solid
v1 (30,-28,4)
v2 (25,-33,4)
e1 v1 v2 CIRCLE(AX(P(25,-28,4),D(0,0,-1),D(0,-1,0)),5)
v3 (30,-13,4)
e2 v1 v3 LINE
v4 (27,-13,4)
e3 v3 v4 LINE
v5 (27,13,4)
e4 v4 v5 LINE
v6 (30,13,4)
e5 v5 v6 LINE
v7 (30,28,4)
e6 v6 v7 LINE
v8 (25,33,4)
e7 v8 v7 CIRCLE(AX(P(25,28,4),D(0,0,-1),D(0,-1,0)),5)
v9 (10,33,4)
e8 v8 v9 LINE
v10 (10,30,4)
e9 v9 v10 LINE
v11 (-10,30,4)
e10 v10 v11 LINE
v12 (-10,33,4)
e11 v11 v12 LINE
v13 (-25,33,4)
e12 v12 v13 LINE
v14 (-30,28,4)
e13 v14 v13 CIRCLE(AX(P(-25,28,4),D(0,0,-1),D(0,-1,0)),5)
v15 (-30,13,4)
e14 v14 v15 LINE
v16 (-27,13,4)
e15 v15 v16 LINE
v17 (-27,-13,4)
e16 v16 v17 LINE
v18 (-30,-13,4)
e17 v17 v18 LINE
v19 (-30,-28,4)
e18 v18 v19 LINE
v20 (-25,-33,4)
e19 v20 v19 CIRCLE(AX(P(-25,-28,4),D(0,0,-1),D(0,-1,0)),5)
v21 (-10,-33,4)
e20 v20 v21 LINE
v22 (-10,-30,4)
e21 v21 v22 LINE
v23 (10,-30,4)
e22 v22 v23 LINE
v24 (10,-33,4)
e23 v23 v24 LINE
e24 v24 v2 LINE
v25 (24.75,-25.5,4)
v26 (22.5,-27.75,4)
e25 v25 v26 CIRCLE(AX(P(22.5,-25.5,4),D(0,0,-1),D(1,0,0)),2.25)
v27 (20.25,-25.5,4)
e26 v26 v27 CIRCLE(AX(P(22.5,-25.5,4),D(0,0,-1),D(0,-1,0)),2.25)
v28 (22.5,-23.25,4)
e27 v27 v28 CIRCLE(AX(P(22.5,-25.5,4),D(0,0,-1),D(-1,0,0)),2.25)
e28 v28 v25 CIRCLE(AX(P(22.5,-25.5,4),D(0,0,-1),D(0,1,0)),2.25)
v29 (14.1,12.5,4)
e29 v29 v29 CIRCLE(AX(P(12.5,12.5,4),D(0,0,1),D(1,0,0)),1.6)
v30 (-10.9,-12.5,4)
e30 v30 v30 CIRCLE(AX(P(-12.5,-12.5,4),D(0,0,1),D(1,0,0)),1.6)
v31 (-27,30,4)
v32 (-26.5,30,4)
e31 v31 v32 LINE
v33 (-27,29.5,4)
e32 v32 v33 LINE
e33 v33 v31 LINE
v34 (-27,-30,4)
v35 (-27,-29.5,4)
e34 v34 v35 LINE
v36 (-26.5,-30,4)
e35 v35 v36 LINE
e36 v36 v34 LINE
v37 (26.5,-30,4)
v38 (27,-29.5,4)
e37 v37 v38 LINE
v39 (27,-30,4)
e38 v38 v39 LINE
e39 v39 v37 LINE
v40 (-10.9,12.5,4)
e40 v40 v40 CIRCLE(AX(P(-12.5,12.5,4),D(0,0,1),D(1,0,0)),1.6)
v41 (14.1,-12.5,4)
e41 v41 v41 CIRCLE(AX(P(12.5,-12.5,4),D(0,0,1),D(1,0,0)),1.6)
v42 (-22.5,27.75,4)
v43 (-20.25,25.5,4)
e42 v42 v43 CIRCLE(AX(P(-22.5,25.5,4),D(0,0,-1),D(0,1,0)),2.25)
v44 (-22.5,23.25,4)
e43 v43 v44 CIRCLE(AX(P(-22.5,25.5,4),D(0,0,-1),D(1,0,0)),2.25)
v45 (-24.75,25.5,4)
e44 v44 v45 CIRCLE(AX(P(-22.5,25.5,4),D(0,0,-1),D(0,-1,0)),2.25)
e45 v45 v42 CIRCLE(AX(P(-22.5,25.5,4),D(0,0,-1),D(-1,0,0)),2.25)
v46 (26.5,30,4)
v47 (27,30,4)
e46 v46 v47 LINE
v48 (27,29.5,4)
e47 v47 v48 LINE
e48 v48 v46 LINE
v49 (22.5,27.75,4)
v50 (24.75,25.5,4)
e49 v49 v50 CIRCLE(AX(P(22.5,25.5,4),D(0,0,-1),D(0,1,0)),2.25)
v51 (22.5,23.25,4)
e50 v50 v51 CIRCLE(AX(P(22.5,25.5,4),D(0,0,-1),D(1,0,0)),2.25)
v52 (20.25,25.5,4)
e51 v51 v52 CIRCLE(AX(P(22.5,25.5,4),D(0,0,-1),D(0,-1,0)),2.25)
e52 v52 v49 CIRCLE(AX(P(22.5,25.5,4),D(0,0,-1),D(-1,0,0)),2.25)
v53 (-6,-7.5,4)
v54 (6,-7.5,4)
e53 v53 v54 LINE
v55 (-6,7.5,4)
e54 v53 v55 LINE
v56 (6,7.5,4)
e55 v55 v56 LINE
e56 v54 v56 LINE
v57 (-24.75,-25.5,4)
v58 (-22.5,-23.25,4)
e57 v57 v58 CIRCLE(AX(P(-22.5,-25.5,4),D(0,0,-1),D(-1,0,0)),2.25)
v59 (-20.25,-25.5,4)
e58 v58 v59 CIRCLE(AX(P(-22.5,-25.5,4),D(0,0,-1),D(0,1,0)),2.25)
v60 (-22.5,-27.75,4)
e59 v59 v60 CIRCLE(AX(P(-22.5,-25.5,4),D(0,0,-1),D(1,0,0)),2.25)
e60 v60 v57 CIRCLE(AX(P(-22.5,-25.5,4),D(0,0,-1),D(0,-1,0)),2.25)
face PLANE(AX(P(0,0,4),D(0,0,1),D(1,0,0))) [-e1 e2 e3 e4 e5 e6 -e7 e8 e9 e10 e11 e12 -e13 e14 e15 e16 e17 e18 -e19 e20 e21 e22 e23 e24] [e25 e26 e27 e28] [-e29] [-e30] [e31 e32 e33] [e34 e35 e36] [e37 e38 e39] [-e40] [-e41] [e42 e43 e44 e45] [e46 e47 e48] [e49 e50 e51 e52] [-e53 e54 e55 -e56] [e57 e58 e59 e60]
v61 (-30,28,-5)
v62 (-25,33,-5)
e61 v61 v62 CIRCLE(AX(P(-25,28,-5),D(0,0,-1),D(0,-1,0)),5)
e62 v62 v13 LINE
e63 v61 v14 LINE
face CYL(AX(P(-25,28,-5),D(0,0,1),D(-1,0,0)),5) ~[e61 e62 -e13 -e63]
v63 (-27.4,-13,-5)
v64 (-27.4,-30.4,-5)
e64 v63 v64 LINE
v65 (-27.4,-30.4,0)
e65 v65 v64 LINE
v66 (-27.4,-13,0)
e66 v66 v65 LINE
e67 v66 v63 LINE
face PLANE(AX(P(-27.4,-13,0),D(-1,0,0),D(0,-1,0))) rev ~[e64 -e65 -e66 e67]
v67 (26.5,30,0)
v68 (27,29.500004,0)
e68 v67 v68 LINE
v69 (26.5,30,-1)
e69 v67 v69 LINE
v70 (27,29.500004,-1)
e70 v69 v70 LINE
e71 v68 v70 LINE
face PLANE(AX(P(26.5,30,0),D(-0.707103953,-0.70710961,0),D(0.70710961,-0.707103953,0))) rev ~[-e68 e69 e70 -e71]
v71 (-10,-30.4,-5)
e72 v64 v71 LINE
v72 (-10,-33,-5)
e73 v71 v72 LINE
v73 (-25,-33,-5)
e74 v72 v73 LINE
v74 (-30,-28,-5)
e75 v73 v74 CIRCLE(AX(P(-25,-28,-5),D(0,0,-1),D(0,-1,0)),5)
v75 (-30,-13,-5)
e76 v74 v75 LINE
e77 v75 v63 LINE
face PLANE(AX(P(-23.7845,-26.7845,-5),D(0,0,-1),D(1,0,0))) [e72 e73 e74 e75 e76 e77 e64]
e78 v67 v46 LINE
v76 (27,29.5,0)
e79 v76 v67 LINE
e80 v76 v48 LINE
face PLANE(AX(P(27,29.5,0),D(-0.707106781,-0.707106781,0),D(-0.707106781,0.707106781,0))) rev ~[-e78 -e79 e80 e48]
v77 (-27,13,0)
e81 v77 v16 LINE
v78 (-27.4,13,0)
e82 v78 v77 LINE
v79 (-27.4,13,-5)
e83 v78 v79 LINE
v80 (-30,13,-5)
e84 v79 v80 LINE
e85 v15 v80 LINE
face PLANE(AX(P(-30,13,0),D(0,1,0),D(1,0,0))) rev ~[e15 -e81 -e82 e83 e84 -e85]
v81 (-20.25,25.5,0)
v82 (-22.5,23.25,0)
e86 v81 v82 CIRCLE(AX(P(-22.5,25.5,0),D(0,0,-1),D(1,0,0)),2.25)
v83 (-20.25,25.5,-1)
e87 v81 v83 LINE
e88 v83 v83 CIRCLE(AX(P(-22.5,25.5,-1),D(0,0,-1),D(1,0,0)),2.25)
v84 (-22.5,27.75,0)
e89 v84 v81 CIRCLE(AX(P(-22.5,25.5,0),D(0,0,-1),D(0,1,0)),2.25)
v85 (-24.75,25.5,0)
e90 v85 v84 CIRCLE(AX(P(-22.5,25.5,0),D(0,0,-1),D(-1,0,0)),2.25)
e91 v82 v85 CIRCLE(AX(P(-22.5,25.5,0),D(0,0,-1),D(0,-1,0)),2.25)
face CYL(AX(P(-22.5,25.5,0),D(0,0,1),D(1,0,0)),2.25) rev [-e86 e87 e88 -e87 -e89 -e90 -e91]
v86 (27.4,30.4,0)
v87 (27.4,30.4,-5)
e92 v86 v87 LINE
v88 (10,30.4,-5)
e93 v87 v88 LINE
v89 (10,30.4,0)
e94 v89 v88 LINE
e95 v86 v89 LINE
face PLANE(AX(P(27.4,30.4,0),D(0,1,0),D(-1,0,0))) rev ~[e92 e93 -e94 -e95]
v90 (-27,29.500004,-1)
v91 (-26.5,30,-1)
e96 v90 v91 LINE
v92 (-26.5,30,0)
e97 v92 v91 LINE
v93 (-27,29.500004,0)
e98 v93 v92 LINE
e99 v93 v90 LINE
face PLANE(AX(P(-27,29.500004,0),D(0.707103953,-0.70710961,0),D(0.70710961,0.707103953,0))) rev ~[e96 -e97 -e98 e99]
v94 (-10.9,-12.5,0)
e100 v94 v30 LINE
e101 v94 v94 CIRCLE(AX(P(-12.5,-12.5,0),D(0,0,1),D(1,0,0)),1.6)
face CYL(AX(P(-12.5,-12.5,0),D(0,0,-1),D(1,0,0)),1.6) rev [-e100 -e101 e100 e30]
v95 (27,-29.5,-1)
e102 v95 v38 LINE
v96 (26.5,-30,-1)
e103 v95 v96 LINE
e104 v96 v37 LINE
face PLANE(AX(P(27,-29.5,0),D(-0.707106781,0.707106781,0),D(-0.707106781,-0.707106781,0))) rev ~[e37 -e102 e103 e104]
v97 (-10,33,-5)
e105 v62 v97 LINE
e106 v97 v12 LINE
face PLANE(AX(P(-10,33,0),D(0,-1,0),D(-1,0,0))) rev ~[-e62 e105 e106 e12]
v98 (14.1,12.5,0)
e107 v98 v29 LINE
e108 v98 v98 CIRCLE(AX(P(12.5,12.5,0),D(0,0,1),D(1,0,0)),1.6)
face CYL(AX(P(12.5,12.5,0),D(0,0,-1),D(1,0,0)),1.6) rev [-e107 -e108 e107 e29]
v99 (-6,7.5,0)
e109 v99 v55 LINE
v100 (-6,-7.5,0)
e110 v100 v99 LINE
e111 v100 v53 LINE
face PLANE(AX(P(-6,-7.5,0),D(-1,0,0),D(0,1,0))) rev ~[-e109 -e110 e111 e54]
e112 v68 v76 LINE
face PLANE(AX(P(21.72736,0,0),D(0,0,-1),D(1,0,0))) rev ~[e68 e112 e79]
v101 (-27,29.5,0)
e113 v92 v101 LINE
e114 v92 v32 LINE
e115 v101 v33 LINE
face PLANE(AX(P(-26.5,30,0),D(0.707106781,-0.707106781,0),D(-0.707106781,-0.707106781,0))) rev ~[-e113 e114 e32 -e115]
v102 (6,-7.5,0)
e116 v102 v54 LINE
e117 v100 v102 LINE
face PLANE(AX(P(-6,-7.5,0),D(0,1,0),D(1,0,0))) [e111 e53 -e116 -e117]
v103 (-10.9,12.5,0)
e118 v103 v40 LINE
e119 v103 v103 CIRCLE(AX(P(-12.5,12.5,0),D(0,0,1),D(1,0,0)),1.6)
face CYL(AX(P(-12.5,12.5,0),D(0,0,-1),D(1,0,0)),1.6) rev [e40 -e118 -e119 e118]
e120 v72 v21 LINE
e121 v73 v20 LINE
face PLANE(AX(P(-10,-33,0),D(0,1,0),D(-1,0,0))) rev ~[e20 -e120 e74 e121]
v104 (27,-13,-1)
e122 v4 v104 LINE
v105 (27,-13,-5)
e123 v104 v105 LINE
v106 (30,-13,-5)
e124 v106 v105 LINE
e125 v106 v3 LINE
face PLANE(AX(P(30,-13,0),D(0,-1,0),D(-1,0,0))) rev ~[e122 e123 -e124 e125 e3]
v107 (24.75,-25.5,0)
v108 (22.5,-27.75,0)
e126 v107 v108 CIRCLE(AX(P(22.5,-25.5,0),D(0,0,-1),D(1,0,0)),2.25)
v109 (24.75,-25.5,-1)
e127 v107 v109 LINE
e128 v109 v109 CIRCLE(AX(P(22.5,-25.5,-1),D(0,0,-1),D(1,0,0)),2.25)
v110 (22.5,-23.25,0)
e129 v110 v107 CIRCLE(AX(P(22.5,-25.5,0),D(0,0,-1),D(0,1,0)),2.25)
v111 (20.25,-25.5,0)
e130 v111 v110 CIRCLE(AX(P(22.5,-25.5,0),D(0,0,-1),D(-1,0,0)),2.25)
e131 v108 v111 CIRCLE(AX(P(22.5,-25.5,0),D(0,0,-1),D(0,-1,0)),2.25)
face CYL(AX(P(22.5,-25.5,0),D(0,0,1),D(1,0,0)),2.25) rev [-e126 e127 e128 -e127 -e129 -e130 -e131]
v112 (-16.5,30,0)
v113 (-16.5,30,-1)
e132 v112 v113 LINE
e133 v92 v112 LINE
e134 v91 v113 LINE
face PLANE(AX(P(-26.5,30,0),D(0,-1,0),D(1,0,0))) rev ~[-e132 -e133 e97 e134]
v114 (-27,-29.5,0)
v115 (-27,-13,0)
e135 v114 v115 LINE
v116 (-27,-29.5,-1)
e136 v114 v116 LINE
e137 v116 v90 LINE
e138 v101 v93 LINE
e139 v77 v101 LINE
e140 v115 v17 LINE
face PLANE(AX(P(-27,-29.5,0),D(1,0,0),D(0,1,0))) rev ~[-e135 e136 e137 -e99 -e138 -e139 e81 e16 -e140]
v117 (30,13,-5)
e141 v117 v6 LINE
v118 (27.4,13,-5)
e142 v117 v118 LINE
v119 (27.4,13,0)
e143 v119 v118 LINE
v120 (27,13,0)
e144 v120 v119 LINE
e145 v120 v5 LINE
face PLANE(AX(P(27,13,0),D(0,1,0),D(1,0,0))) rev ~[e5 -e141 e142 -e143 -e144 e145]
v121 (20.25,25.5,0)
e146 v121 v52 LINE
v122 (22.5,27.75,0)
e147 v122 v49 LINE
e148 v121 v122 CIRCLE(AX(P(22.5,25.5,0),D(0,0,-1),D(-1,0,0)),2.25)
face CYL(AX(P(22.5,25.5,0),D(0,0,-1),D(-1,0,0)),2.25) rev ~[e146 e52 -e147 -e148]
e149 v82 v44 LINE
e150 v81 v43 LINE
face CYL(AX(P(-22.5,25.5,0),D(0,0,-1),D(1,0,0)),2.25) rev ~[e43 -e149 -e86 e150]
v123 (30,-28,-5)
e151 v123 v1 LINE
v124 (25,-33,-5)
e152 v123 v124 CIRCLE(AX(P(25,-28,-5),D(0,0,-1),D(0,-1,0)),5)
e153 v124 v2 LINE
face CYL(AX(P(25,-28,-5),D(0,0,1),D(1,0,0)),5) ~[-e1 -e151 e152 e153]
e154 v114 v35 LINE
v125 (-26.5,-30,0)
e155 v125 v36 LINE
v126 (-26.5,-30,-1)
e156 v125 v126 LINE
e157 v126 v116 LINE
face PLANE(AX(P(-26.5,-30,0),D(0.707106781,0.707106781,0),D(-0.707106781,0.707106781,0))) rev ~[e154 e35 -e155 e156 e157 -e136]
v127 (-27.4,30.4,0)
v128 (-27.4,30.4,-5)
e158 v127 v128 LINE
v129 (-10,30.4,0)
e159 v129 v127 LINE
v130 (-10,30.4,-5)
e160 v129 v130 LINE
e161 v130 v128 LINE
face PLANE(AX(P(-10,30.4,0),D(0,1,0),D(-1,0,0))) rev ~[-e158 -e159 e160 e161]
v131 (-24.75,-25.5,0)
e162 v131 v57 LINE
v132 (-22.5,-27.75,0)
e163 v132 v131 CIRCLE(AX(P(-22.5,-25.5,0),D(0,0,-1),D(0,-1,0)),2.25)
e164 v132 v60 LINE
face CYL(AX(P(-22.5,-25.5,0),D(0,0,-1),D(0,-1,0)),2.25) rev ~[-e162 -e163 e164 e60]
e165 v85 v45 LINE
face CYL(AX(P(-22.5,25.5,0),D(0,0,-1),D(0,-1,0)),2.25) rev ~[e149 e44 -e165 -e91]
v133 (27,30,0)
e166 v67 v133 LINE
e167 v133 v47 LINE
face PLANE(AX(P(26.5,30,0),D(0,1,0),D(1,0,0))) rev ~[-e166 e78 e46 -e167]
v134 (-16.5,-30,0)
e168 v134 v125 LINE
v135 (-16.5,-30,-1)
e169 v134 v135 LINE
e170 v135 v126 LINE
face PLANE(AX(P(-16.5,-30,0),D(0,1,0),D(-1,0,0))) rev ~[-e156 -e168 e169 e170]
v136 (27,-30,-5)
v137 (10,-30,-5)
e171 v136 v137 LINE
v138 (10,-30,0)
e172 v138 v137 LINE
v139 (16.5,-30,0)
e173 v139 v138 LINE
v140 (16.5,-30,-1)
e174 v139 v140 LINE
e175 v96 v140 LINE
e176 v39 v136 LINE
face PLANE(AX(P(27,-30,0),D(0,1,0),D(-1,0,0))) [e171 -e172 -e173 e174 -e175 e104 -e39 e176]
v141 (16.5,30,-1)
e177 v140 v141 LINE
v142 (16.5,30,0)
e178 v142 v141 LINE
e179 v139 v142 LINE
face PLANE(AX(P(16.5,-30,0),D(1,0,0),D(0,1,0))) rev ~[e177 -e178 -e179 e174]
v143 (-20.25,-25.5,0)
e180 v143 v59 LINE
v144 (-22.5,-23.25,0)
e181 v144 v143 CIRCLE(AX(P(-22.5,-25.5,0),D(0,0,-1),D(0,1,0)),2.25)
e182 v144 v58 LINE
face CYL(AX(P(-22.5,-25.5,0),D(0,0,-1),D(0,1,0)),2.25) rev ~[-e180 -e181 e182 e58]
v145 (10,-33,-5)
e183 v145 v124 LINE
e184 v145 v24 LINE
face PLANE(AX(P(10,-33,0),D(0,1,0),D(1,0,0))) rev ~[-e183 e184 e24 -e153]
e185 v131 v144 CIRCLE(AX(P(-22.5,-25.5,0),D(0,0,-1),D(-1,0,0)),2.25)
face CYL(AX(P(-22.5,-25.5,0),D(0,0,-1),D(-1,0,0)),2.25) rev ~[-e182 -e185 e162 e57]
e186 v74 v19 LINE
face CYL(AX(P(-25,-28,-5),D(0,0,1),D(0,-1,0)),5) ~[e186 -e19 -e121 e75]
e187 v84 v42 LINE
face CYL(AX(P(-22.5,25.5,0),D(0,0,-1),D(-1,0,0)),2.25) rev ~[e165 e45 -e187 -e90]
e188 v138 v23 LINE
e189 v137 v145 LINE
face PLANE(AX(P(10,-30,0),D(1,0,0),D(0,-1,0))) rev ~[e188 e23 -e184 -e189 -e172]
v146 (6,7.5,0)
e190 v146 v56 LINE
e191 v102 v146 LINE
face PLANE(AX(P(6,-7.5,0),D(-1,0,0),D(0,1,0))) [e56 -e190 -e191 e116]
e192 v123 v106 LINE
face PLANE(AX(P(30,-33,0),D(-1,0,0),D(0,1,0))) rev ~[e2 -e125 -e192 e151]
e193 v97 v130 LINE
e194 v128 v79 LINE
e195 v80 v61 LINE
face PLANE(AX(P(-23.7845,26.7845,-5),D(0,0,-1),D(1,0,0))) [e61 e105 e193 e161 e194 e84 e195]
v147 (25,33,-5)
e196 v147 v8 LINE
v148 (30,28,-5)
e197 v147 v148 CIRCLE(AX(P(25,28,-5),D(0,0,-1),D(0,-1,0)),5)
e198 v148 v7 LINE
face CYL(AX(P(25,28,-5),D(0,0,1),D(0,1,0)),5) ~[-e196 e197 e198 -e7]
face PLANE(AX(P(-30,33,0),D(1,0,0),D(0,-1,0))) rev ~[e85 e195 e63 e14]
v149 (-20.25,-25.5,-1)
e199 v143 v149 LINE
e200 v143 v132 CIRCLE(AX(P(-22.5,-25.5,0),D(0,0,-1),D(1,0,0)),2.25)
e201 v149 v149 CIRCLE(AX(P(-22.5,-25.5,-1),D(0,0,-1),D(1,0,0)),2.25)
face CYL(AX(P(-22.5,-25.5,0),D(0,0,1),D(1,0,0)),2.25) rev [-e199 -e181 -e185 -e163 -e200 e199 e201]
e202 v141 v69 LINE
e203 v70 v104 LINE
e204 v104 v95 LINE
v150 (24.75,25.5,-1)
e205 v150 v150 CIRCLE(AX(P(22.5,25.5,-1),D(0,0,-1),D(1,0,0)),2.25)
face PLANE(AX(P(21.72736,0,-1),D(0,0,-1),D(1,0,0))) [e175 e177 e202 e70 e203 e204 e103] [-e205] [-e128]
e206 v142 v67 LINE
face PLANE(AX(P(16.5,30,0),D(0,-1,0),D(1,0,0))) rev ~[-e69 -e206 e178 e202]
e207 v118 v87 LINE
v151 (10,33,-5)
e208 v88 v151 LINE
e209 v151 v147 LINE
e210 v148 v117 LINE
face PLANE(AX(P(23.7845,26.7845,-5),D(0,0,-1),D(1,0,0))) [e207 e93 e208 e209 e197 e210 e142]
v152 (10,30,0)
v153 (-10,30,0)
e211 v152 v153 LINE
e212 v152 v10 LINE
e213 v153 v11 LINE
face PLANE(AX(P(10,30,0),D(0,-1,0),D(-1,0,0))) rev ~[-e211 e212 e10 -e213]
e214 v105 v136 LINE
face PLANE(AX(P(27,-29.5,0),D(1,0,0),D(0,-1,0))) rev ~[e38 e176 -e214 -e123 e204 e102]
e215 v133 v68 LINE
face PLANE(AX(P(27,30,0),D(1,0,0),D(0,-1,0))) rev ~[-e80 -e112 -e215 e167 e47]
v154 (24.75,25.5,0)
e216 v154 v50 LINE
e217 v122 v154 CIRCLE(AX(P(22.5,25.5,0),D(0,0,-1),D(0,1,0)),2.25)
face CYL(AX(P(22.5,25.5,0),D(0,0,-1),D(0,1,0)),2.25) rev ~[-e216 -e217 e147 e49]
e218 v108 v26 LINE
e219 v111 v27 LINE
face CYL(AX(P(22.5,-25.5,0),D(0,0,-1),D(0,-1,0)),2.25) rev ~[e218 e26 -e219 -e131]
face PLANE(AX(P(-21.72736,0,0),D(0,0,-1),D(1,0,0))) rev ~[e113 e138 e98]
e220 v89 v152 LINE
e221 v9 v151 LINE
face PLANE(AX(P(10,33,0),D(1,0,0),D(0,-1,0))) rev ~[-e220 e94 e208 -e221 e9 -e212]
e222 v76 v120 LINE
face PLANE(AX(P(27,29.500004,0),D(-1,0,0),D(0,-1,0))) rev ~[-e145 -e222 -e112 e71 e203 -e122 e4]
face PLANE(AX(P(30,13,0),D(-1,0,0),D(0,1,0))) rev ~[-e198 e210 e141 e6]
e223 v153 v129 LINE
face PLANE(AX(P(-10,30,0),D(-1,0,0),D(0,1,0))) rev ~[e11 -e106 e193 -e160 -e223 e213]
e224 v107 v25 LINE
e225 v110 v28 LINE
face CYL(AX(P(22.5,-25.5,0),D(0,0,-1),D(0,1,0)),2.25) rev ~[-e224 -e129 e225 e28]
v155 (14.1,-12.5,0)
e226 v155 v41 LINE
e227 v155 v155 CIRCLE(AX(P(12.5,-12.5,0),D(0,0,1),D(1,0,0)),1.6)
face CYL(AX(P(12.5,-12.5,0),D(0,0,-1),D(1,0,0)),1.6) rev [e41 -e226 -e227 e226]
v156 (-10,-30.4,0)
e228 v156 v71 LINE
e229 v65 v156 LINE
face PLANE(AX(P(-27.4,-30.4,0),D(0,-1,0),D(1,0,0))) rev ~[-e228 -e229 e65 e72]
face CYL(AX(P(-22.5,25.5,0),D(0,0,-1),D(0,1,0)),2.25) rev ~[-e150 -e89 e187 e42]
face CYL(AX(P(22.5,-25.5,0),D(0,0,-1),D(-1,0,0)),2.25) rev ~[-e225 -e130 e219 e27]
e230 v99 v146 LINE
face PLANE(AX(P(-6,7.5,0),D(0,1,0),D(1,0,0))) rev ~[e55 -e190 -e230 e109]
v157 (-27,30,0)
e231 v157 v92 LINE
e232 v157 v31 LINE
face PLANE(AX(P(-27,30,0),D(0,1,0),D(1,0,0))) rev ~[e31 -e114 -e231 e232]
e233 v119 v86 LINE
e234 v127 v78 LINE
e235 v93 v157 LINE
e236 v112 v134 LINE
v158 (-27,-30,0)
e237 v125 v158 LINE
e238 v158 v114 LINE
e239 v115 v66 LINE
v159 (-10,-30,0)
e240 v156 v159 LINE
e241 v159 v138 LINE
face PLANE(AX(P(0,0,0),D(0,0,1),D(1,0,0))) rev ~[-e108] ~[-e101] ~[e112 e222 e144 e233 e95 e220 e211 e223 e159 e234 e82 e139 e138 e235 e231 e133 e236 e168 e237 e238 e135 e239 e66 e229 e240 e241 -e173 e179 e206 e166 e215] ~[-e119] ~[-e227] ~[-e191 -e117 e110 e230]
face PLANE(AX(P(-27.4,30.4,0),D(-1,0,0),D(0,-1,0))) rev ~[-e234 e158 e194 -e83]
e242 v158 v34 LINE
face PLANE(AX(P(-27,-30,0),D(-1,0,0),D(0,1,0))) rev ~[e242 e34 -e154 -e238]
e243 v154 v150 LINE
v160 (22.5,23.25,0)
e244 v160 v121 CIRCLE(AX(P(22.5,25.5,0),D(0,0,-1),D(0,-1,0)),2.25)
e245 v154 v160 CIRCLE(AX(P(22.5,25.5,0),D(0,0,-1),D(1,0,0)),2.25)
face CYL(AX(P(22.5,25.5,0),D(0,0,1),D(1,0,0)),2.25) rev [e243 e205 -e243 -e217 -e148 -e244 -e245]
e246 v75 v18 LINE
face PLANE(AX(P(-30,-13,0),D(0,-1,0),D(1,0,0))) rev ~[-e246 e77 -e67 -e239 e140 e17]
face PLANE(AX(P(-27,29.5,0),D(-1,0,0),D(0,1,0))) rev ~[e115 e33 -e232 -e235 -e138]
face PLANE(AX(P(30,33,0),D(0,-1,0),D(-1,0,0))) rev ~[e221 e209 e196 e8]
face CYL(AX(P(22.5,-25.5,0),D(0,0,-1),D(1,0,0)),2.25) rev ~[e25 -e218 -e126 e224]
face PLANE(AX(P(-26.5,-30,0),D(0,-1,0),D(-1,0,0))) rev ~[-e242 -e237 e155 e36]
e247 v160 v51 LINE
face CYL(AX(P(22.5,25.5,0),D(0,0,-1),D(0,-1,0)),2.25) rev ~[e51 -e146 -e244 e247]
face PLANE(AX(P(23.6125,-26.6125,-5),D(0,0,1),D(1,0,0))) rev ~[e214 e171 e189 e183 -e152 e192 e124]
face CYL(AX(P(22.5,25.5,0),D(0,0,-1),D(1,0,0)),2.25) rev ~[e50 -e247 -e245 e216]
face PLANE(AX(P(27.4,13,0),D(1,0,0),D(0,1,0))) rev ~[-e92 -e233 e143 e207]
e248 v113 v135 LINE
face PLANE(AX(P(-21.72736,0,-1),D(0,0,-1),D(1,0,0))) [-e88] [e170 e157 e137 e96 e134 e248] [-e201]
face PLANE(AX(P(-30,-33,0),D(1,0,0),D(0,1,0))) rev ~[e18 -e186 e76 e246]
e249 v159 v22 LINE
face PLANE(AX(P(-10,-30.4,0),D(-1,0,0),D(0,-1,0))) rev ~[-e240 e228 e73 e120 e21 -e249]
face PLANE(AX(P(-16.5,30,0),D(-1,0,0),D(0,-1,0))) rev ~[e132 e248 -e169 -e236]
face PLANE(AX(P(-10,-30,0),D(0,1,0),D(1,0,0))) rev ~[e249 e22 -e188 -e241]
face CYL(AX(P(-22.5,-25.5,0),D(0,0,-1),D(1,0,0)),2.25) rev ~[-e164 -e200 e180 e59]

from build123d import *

# Parameters (mm, degrees)
F0_R     = 1.6
F0_W     = 12
F0_H     = 15
F1_DEPTH = 4
F2_R     = 2.25
F3_DEPTH = 1
F4_DEPTH = 5
F5_R     = 5


# Not quite as in the source:
# - ends of sketch curves that miss each other by under 0.0002 mm in the source are joined


with BuildPart() as f1:
    # F0 (on Top) → F1 (new body)
    with BuildSketch(Plane.XY):
        Polygon((-26.600003, -29.899997), (-26.5, -30), (-10, -30), (10, -30), (26.5, -30), (26.6, -29.9), (27, -29.5), (27, -13), (27, 13), (27, 29.5), (26.5999975, 29.9000025), (26.5, 30), (10, 30), (-10, 30), (-26.5, 30), (-26.599999, 29.900001), (-27, 29.5), (-27, 13), (-27, -13), (-27, -29.5), align=None)
        with BuildLine():
            ThreePointArc((-22.5, -23.25), (-20.9090097423, -23.9090097423), (-20.25, -25.5))
            ThreePointArc((-20.25, -25.5), (-20.9090097423, -27.0909902577), (-22.5, -27.75))
            ThreePointArc((-22.5, -27.75), (-24.0909902577, -27.0909902577), (-24.75, -25.5))
            ThreePointArc((-24.75, -25.5), (-24.0909902577, -23.9090097423), (-22.5, -23.25))
        make_face(mode=Mode.SUBTRACT)
        with Locations((-12.5, -12.5)):
            Circle(F0_R, mode=Mode.SUBTRACT)
        with BuildLine():
            ThreePointArc((22.5, -23.25), (24.0909902577, -23.9090097423), (24.75, -25.5))
            ThreePointArc((24.75, -25.5), (24.0909902577, -27.0909902577), (22.5, -27.75))
            ThreePointArc((22.5, -27.75), (20.9090097423, -27.0909902577), (20.25, -25.5))
            ThreePointArc((20.25, -25.5), (20.9090097423, -23.9090097423), (22.5, -23.25))
        make_face(mode=Mode.SUBTRACT)
        with Locations((12.5, -12.5)):
            Circle(F0_R, mode=Mode.SUBTRACT)
        with Locations((-12.5, 12.5)):
            Circle(F0_R, mode=Mode.SUBTRACT)
        with BuildLine():
            ThreePointArc((-22.5, 27.75), (-20.9090097423, 27.0909902577), (-20.25, 25.5))
            ThreePointArc((-20.25, 25.5), (-20.9090097423, 23.9090097423), (-22.5, 23.25))
            ThreePointArc((-22.5, 23.25), (-24.0909902577, 23.9090097423), (-24.75, 25.5))
            ThreePointArc((-24.75, 25.5), (-24.0909902577, 27.0909902577), (-22.5, 27.75))
        make_face(mode=Mode.SUBTRACT)
        Rectangle(F0_W, F0_H, mode=Mode.SUBTRACT)
        with Locations((12.5, 12.5)):
            Circle(F0_R, mode=Mode.SUBTRACT)
        with BuildLine():
            ThreePointArc((22.5, 27.75), (24.0909902577, 27.0909902577), (24.75, 25.5))
            ThreePointArc((24.75, 25.5), (24.0909902577, 23.9090097423), (22.5, 23.25))
            ThreePointArc((22.5, 23.25), (20.9090097423, 23.9090097423), (20.25, 25.5))
            ThreePointArc((20.25, 25.5), (20.9090097423, 27.0909902577), (22.5, 27.75))
        make_face(mode=Mode.SUBTRACT)
        Polygon((-10, -30), (-26.5, -30), (-26.6, -30), (-27, -30), (-27, -29.5), (-27, -13), (-30, -13), (-30, -33), (-10, -33), align=None)
        Polygon((26.5, -30), (10, -30), (10, -33), (30, -33), (30, -13), (27, -13), (27, -29.5), (27, -30), (26.6, -30), align=None)
        Polygon((27, 29.5), (27, 13), (30, 13), (30, 33), (10, 33), (10, 30), (26.5, 30), (26.6, 30), (27, 30), align=None)
        Polygon((-30, 13), (-27, 13), (-27, 29.5), (-27, 30), (-26.6, 30), (-26.5, 30), (-10, 30), (-10, 33), (-30, 33), align=None)
    extrude(amount=F1_DEPTH)

    # F2 (on face) → F3 (join)
    with BuildSketch(Plane(origin=(0, 0, 0), x_dir=(1, 0, 0), z_dir=(0, 0, -1))):
        Polygon((-16.5, -30), (-16.5, 30), (-26.5, 30), (-27, 29.5), (-27, 13), (-27, -13), (-27, -29.500004), (-26.5, -30), align=None)
        with Locations((-22.5, -25.5)):
            Circle(F2_R, mode=Mode.SUBTRACT)
        with Locations((-22.5, 25.5)):
            Circle(F2_R, mode=Mode.SUBTRACT)
        Polygon((27, -13), (27, 13), (27, 29.5), (26.5, 30), (16.5, 30), (16.5, -30), (26.5, -30), (27, -29.500004), align=None)
        with Locations((22.5, -25.5)):
            Circle(F2_R, mode=Mode.SUBTRACT)
        with Locations((22.5, 25.5)):
            Circle(F2_R, mode=Mode.SUBTRACT)
    extrude(amount=F3_DEPTH)

    # F2 (on face) + F0 (on Top) → F4 (join)
    with BuildSketch(Plane(origin=(0, 0, 0), x_dir=(1, 0, 0), z_dir=(0, 0, -1))):
        Polygon((-30, 13), (-27.4, 13), (-27.4, 30.4), (-10, 30.4), (-10, 33), (-30, 33), align=None)
        Polygon((-27.4, -30.4), (-27.4, -13), (-30, -13), (-30, -33), (-10, -33), (-10, -30.4), align=None)
        Polygon((27.4, -30.4), (10, -30.4), (10, -33), (30, -33), (30, -13), (27.4, -13), align=None)
    with BuildSketch(Plane.XY):
        Polygon((26.5, -30), (10, -30), (10, -33), (30, -33), (30, -13), (27, -13), (27, -29.5), (27, -30), (26.6, -30), align=None)
    extrude(amount=F4_DEPTH, dir=(0, 0, -1))

    # F5
    f5_edges = [f1.edges().sort_by_distance(p)[0] for p in [
        (30, -33, -0.5),
        (30, 33, -0.5),
        (-30, 33, -0.5),
        (-30, -33, -0.5),
    ]]
    fillet(f5_edges, radius=F5_R)


solid = f1.part
